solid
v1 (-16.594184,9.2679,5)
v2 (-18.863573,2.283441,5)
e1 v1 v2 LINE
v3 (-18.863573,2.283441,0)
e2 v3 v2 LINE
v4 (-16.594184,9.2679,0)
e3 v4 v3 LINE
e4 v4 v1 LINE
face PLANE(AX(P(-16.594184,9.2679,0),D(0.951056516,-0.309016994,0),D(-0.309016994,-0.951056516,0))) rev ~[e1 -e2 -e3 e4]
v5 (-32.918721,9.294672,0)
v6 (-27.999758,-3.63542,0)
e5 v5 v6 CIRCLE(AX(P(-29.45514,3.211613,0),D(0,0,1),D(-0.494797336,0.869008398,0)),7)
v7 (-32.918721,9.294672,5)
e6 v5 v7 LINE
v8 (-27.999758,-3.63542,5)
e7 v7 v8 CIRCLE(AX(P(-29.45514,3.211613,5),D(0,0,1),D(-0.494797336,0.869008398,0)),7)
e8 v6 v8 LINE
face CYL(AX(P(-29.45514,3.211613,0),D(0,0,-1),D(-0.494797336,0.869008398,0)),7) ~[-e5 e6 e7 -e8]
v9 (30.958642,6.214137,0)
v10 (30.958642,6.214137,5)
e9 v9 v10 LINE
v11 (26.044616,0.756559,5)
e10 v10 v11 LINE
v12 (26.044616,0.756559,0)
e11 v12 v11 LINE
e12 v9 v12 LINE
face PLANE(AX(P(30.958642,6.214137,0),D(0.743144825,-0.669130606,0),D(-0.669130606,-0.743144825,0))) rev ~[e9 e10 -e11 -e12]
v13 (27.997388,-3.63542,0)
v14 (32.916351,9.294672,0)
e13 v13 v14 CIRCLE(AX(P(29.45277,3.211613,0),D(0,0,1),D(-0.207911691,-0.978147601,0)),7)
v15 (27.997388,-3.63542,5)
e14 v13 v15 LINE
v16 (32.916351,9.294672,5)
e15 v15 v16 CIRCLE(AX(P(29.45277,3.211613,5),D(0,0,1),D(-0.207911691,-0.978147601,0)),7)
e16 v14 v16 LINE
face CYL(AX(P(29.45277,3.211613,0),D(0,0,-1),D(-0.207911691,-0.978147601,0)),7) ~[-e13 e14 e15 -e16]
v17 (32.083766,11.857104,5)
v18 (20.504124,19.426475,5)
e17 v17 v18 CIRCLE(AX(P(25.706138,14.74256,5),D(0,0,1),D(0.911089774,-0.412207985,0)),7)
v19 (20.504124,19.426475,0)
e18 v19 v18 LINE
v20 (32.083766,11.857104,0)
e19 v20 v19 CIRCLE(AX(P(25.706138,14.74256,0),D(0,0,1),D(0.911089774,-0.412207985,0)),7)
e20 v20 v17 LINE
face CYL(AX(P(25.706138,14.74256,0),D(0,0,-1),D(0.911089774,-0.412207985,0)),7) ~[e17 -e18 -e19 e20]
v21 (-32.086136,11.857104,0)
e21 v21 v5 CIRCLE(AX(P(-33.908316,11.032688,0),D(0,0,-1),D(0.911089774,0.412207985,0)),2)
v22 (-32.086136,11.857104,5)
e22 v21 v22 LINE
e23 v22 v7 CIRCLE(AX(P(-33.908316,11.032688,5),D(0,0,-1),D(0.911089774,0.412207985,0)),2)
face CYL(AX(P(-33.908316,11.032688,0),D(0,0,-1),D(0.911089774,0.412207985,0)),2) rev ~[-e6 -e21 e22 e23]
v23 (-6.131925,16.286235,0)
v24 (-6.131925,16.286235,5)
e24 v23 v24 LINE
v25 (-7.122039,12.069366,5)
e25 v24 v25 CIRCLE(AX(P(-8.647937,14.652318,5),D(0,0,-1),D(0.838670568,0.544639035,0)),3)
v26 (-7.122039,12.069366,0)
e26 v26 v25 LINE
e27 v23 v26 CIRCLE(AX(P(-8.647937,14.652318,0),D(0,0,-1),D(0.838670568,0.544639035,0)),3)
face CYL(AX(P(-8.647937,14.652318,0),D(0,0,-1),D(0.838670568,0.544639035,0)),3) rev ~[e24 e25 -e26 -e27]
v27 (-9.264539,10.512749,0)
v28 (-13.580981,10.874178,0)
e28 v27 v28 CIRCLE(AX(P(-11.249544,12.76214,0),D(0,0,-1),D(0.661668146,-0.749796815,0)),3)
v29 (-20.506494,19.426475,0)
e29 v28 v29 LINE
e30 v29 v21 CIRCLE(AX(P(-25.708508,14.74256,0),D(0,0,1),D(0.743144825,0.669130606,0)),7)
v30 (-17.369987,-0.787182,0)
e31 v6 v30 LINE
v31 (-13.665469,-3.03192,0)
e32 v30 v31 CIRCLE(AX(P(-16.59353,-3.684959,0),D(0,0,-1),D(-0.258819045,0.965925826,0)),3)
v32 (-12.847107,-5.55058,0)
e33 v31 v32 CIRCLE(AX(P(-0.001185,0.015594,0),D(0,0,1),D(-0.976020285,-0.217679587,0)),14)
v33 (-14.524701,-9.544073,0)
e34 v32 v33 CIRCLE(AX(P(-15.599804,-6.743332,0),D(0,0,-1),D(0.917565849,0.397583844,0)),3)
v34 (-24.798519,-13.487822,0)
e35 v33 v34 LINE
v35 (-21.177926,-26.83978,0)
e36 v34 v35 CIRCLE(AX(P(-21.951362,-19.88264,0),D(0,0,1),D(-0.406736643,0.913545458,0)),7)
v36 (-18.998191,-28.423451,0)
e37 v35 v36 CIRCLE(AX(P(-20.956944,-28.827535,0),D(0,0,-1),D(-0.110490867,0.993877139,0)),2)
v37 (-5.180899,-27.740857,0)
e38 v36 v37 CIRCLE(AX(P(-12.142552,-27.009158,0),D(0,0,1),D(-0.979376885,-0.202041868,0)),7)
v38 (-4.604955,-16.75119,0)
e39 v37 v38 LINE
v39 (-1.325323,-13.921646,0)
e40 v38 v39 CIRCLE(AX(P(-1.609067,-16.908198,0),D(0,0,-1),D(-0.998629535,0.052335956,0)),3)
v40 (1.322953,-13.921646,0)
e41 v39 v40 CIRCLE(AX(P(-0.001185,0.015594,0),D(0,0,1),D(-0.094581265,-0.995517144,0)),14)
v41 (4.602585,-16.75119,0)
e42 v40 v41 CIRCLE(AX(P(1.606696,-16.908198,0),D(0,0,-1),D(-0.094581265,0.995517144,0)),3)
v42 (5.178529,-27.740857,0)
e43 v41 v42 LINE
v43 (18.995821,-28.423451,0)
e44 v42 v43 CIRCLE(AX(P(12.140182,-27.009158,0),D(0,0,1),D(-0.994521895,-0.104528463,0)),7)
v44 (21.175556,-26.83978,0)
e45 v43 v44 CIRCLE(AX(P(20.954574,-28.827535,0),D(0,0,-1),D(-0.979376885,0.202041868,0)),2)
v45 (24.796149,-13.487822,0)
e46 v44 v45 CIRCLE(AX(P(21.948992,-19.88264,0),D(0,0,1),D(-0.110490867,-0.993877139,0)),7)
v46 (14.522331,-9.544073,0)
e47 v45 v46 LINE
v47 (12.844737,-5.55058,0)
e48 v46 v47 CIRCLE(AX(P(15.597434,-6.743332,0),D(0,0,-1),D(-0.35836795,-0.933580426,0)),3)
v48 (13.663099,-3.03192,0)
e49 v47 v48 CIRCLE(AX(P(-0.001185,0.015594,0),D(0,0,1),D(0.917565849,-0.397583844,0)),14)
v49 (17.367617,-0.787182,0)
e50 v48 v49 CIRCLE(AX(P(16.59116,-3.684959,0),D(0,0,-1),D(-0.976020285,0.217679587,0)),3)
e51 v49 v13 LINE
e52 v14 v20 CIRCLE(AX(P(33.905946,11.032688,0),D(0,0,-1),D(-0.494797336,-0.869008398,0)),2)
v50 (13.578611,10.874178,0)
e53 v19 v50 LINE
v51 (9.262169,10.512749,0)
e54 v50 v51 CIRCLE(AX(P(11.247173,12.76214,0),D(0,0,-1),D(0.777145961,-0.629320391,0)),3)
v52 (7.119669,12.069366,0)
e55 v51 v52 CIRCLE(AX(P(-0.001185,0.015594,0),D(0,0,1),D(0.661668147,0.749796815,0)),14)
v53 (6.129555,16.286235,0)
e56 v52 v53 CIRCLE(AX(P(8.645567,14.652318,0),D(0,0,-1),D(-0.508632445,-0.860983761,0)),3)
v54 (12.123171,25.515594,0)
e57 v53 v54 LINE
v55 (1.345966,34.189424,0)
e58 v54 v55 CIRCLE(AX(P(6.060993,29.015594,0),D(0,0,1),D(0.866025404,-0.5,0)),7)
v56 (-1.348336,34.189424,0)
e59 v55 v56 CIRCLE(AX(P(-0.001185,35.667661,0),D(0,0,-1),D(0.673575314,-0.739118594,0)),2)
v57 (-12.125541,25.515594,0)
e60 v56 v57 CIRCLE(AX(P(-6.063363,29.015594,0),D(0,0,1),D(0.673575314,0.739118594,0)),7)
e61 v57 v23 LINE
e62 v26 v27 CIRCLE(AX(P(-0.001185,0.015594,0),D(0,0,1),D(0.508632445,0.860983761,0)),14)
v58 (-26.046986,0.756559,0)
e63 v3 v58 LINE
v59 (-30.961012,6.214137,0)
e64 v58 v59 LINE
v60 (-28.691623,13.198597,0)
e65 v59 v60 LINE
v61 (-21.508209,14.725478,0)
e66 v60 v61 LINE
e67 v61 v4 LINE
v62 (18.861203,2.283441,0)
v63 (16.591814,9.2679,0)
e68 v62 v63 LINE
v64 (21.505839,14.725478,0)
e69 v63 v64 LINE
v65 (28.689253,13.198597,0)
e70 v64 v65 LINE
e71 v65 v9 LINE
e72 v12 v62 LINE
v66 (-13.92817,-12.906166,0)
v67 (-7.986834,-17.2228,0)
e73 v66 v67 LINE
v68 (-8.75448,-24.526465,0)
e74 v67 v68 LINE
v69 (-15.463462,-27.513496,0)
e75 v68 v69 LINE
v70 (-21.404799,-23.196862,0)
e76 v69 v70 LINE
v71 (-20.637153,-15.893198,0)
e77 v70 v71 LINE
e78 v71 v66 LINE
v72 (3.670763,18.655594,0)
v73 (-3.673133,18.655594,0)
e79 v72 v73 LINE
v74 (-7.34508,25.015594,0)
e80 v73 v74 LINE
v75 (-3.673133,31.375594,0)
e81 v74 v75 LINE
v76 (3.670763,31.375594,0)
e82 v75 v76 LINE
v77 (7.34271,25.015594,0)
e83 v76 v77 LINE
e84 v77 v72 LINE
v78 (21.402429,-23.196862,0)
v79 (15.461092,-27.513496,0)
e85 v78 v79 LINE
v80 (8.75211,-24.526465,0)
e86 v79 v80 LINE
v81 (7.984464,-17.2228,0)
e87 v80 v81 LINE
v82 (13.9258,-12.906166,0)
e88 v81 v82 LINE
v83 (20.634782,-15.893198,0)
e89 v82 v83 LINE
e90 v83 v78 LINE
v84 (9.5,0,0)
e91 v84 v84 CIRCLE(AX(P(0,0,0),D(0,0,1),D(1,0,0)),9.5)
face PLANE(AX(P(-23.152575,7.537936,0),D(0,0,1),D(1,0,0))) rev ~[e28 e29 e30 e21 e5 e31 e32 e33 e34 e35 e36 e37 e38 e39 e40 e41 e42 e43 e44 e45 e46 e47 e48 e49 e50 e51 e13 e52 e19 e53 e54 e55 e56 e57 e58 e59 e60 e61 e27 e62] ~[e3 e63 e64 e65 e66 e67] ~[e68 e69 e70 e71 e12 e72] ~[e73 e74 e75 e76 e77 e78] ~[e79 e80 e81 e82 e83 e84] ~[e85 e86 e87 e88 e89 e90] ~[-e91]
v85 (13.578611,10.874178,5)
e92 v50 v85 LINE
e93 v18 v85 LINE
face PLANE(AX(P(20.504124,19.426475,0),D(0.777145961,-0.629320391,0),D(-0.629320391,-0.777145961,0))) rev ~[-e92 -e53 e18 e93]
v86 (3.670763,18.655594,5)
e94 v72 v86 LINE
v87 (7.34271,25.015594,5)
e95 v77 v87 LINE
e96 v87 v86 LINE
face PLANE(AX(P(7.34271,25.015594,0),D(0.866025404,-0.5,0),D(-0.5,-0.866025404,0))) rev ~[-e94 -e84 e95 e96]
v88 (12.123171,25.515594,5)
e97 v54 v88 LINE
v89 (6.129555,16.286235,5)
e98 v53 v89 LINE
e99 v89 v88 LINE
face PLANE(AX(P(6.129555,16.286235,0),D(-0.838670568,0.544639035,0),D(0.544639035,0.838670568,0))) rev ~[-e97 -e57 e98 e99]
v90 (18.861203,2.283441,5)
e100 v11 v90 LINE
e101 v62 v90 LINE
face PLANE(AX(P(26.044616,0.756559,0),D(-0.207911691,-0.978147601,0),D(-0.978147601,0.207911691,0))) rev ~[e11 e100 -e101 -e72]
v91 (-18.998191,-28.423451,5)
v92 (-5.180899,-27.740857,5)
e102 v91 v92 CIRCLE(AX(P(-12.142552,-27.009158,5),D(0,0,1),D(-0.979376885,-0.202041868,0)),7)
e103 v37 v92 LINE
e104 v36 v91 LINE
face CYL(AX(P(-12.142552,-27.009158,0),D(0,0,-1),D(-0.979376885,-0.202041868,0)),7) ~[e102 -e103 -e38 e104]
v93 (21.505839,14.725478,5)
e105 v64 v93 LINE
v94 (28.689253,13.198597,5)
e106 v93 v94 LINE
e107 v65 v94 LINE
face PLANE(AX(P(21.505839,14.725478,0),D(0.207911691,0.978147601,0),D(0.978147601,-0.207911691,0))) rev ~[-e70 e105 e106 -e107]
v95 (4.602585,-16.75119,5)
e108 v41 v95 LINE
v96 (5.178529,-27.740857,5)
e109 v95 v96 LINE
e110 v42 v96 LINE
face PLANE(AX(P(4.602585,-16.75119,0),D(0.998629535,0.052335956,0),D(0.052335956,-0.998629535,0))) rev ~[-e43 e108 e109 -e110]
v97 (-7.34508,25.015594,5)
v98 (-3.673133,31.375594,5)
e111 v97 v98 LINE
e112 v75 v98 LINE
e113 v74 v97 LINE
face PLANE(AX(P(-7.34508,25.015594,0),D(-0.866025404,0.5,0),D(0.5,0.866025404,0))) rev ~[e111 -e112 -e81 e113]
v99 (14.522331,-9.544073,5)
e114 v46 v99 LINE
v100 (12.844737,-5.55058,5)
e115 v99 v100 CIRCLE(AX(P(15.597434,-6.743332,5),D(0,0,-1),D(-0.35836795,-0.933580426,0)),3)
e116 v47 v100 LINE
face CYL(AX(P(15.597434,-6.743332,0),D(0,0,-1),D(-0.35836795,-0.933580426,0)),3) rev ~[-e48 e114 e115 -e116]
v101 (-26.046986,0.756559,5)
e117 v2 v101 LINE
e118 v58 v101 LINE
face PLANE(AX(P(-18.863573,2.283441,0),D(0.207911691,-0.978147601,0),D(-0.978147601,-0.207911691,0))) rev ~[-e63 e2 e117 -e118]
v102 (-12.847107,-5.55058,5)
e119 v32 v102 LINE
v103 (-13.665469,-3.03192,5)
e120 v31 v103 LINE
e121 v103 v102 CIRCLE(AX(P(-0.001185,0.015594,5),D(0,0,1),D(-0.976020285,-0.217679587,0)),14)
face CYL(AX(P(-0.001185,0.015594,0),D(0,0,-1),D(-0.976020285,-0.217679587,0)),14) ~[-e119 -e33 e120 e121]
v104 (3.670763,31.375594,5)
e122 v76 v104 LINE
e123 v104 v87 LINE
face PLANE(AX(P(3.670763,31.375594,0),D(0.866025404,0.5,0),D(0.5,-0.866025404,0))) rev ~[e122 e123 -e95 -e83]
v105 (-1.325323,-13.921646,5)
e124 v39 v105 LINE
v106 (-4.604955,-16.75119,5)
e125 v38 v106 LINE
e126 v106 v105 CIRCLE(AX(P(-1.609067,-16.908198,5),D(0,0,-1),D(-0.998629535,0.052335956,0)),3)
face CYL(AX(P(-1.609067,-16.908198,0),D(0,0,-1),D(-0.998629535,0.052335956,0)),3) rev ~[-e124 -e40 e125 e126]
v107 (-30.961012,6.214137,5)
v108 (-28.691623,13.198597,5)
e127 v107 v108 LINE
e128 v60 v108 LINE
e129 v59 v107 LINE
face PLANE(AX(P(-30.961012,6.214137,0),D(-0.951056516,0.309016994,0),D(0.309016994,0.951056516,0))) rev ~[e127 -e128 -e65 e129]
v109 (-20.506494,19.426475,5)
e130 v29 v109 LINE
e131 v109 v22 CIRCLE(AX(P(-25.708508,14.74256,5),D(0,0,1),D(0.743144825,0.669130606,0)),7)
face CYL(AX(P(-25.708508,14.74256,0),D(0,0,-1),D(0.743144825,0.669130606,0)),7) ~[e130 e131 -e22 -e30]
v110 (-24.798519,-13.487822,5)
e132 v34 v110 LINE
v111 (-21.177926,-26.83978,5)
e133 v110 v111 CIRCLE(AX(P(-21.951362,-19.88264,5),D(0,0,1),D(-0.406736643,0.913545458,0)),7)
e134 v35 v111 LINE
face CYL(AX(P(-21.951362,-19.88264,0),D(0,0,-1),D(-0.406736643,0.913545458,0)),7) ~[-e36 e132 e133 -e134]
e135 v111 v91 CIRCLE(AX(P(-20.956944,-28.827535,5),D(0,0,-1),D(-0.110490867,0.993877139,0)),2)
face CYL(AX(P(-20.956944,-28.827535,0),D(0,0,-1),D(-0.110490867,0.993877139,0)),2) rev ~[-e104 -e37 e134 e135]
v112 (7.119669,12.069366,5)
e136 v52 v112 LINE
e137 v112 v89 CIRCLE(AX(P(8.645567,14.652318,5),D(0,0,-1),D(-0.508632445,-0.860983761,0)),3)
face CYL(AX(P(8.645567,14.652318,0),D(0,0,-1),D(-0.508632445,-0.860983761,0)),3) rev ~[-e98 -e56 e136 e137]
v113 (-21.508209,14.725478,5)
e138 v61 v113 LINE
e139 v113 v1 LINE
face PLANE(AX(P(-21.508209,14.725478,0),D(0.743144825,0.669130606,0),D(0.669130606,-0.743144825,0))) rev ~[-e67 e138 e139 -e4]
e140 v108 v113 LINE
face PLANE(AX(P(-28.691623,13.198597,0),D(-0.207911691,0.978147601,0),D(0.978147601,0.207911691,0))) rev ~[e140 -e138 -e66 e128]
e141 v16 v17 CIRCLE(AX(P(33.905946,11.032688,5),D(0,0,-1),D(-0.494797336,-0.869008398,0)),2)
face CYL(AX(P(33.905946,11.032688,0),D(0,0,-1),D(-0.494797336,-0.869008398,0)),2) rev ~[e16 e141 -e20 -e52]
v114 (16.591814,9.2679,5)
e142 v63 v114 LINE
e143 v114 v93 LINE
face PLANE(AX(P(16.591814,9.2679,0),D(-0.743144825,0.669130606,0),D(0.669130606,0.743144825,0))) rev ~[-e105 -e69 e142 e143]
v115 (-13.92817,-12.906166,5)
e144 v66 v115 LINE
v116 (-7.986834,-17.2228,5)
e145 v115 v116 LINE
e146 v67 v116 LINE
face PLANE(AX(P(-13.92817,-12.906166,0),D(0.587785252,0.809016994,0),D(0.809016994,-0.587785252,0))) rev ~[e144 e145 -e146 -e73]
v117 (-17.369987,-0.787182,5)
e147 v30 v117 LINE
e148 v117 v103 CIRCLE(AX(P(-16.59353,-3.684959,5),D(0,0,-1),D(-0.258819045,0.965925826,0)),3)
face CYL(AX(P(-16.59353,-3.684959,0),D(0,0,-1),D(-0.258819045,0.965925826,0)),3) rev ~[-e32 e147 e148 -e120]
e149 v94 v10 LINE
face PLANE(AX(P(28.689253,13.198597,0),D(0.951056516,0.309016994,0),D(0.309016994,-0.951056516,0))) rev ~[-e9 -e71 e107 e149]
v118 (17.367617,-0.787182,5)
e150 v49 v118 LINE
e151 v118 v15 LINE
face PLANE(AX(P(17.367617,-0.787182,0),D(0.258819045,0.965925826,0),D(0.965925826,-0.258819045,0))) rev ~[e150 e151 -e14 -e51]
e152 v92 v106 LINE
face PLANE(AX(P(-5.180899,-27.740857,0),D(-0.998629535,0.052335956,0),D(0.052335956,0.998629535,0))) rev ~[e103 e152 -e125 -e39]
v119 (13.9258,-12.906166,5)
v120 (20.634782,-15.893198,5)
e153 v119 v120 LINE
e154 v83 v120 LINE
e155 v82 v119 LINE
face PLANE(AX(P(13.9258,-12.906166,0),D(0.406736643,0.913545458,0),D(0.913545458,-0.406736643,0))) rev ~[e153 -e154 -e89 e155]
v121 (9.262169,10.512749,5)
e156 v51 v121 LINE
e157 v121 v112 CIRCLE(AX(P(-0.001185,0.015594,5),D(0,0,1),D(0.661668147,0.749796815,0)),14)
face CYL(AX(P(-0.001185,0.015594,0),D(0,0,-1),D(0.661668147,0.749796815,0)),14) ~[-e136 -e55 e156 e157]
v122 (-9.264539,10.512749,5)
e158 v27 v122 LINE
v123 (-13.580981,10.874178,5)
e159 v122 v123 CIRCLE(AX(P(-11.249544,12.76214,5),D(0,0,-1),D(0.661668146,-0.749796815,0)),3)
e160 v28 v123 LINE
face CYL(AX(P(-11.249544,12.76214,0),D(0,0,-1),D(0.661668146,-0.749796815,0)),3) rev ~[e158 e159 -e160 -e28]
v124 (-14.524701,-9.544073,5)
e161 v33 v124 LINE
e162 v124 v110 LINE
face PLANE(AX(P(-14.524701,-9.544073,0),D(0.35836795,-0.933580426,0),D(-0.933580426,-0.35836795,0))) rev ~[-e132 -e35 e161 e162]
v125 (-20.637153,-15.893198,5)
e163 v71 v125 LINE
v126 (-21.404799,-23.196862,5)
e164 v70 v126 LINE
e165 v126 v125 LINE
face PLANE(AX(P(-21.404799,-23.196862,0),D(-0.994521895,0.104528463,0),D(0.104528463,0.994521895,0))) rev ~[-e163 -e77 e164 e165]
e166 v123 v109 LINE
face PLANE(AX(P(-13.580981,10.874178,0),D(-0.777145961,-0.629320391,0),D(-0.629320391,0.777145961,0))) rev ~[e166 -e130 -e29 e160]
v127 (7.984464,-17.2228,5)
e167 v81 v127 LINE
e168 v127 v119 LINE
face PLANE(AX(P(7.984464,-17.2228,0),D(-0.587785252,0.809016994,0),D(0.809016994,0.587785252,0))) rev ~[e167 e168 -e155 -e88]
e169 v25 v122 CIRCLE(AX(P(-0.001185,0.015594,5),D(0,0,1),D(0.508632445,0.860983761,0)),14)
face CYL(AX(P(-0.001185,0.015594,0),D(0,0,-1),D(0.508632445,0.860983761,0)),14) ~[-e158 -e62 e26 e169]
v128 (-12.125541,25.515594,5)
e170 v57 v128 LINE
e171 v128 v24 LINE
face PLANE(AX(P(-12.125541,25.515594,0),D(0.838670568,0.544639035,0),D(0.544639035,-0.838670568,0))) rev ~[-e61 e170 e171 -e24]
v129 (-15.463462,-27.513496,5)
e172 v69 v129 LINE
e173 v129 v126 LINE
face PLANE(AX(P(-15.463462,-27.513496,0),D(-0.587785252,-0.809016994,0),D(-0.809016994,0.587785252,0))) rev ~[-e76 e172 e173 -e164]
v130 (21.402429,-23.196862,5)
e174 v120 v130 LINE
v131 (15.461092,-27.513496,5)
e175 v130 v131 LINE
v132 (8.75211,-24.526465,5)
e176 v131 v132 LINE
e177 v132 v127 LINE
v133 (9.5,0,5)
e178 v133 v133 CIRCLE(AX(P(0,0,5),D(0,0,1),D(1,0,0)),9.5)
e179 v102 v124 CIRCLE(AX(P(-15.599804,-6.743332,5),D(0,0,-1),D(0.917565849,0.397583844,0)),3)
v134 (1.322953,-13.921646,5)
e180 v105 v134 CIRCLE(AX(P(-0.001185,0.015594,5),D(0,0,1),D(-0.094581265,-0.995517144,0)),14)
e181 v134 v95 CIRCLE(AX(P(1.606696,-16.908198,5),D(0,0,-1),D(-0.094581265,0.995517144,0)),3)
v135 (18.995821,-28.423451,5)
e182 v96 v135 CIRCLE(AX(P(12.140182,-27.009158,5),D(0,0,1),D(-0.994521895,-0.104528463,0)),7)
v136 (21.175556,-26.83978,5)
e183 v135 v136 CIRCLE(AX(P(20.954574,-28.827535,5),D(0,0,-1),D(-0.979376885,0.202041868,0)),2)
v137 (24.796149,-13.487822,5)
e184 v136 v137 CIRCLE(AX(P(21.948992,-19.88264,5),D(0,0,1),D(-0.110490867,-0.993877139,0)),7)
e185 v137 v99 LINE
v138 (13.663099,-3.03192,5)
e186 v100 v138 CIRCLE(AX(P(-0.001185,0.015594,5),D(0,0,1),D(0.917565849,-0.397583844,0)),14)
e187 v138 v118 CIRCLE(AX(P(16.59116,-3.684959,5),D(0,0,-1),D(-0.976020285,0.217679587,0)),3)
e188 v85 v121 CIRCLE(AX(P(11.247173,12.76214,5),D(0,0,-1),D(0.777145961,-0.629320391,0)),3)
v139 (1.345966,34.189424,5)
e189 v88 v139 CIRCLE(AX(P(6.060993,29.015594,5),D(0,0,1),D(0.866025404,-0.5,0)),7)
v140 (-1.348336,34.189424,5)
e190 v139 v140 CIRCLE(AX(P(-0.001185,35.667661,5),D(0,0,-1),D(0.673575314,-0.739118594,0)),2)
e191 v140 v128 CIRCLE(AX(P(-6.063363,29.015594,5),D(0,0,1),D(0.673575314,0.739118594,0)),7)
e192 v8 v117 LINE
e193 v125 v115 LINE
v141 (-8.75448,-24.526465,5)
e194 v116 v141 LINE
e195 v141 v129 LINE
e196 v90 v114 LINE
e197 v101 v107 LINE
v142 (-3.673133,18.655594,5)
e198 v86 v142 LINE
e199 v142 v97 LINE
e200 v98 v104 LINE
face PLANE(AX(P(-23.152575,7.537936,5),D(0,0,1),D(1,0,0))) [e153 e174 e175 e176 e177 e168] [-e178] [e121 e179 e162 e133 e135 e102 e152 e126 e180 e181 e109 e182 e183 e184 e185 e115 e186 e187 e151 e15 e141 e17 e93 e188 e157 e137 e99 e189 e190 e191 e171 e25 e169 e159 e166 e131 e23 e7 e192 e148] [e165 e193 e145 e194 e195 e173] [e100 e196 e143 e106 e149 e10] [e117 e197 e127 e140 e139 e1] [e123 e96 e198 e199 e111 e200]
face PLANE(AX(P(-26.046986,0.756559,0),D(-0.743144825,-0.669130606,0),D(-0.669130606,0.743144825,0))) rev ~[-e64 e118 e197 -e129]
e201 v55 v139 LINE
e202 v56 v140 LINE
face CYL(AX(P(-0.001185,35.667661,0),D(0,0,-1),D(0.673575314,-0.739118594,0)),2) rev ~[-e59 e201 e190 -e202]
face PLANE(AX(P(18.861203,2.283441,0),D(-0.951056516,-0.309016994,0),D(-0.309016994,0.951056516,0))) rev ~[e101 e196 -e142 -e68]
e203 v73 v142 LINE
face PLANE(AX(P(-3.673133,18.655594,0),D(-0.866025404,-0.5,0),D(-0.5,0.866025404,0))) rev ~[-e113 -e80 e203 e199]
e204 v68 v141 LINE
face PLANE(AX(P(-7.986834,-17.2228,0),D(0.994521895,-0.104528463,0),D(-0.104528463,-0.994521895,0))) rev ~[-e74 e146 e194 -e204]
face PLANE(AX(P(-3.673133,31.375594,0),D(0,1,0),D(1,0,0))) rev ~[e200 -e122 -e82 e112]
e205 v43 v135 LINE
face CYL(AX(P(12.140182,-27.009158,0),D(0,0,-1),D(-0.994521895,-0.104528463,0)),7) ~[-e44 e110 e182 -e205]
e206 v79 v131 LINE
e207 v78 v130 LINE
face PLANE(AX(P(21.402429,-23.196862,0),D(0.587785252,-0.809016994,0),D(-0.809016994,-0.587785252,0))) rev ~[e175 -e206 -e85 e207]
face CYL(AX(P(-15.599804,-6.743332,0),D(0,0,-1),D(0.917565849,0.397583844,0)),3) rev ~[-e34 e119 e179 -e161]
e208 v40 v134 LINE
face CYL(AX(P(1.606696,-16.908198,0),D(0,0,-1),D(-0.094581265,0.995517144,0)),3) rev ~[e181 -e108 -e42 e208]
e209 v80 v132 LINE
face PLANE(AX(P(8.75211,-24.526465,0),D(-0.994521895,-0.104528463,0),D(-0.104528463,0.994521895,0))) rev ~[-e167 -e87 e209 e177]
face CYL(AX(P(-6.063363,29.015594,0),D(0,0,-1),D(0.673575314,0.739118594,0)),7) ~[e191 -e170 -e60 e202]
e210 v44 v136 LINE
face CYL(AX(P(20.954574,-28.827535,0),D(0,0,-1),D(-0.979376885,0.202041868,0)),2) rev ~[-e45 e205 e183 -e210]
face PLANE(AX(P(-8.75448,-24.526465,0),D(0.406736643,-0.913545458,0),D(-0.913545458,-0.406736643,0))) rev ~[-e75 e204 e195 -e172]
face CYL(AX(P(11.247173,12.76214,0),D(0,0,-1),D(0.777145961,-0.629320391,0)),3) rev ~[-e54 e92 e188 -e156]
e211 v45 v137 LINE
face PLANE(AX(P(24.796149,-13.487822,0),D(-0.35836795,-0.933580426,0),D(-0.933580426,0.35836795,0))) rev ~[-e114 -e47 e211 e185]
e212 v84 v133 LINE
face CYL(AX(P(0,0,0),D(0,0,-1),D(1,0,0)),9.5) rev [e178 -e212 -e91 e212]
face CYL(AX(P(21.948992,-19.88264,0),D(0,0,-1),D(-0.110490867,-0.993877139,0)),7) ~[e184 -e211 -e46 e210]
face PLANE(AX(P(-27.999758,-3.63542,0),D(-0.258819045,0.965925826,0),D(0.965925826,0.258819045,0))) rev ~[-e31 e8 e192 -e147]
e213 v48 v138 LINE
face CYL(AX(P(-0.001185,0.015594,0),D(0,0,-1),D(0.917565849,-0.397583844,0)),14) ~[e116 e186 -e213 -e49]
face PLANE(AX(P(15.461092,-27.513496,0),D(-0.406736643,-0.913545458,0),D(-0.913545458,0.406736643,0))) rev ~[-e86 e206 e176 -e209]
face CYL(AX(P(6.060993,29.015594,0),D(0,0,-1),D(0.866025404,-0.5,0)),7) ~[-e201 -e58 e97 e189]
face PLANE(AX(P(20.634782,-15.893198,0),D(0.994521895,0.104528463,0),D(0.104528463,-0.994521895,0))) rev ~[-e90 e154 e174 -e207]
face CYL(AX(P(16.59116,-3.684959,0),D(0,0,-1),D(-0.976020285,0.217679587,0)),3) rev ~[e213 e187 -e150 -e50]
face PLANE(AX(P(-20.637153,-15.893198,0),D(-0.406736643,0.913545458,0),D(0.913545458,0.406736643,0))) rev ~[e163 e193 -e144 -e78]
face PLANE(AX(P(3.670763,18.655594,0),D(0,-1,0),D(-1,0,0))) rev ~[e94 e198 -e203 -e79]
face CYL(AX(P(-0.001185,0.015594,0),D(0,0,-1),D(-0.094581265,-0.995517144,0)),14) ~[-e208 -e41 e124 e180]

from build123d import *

# Parameters (mm, degrees)
F0_R     = 9.5
F1_DEPTH = 5


# Not quite as in the source:
# - a feature names something its author has since deleted; it is built from what else it names


with BuildPart() as f1:
    # F0 (on Top) → F1 (new body)
    with BuildSketch(Plane.XY):
        with BuildLine():
            ThreePointArc((-13.665469042, -3.0319204432), (-13.3159762762, 4.3418317), (-9.2645390994, 10.5127491897))
            ThreePointArc((-9.2645390994, 10.5127491897), (-11.4998669549, 9.7726015122), (-13.5809814233, 10.8741784618))
            Line((-13.5809814233, 10.8741784618), (-20.506494271, 19.426474585))
            ThreePointArc((-20.506494271, 19.426474585), (-29.538567909, 20.601795911), (-32.0861364699, 11.8571044442))
            ThreePointArc((-32.0861364699, 11.8571044442), (-32.0062029861, 10.4146544851), (-32.9187213461, 9.2946716776))
            ThreePointArc((-32.9187213461, 9.2946716776), (-35.997695766, 0.7226444411), (-27.9997581563, -3.6354203143))
            Line((-27.9997581563, -3.6354203143), (-17.3699870332, -0.7871817262))
            ThreePointArc((-17.3699870332, -0.7871817262), (-15.0388393758, -1.1192356462), (-13.665469042, -3.0319204432))
        make_face()
        Polygon((-28.6916231536, 13.1985965214), (-21.5082094645, 14.7254782362), (-16.5941842664, 9.267900353), (-18.8635727573, 2.2834407549), (-26.0469864464, 0.7565590401), (-30.9610116446, 6.2141369233), align=None, mode=Mode.SUBTRACT)
        with BuildLine():
            ThreePointArc((9.2621690031, 10.5127491897), (8.227808484, 11.3418317), (7.1196691813, 12.0693664265))
            ThreePointArc((7.1196691813, 12.0693664265), (-0.0011850481, 14.0155937788), (-7.1220392775, 12.0693664265))
            ThreePointArc((-7.1220392775, 12.0693664265), (-8.2301785802, 11.3418317), (-9.2645390994, 10.5127491897))
            ThreePointArc((-9.2645390994, 10.5127491897), (-13.3159762762, 4.3418317), (-13.665469042, -3.0319204432))
            ThreePointArc((-13.665469042, -3.0319204432), (-13.3159762762, -4.3106441425), (-12.847106931, -5.5505800398))
            ThreePointArc((-12.847106931, -5.5505800398), (-8.2301785802, -11.3106441425), (-1.3253227589, -13.9216462393))
            ThreePointArc((-1.3253227589, -13.9216462393), (-0.0011850481, -13.9844062212), (1.3229526627, -13.9216462393))
            ThreePointArc((1.3229526627, -13.9216462393), (8.227808484, -11.3106441425), (12.8447368348, -5.5505800398))
            ThreePointArc((12.8447368348, -5.5505800398), (13.31360618, -4.3106441425), (13.6630989458, -3.0319204432))
            ThreePointArc((13.6630989458, -3.0319204432), (13.9146328566, -1.5173811207), (13.9988149519, 0.0155937788))
            ThreePointArc((13.9988149519, 0.0155937788), (12.7598289539, 5.7737637694), (9.2621690031, 10.5127491897))
        make_face()
        Circle(F0_R, mode=Mode.SUBTRACT)
        with BuildLine():
            ThreePointArc((-1.3253227589, -13.9216462393), (-8.2301785802, -11.3106441425), (-12.847106931, -5.5505800398))
            ThreePointArc((-12.847106931, -5.5505800398), (-12.8339389546, -7.9052213736), (-14.5247006287, -9.5440728519))
            Line((-14.5247006287, -9.5440728519), (-24.7985187507, -13.4878221314))
            ThreePointArc((-24.7985187507, -13.4878221314), (-28.7073800051, -21.7146403569), (-21.1779261823, -26.8397803113))
            ThreePointArc((-21.1779261823, -26.8397803113), (-19.7813739443, -27.2095006015), (-18.998190678, -28.4234508549))
            ThreePointArc((-18.998190678, -28.4234508549), (-11.7971637379, -34.0006316328), (-5.1808992125, -27.7408570242))
            Line((-5.1808992125, -27.7408570242), (-4.6049551583, -16.7511898031))
            ThreePointArc((-4.6049551583, -16.7511898031), (-3.5687888714, -14.6367469374), (-1.3253227589, -13.9216462393))
        make_face()
        Polygon((-21.4047986615, -23.1968624525), (-20.6371525584, -15.8931976559), (-13.9281702523, -12.906166284), (-7.9868340493, -17.2227997087), (-8.7544801524, -24.5264645053), (-15.4634624585, -27.5134958771), align=None, mode=Mode.SUBTRACT)
        with BuildLine():
            ThreePointArc((7.1196691813, 12.0693664265), (5.7249926142, 13.9665713389), (6.1295548123, 16.2862348132))
            Line((6.1295548123, 16.2862348132), (12.1231706049, 25.5155937788))
            ThreePointArc((12.1231706049, 25.5155937788), (10.4499033622, 34.4688005315), (1.34596558, 34.1894239382))
            ThreePointArc((1.34596558, 34.1894239382), (-0.0011850481, 33.6676611266), (-1.3483356762, 34.1894239382))
            ThreePointArc((-1.3483356762, 34.1894239382), (-10.4522734584, 34.4688005315), (-12.1255407011, 25.5155937788))
            Line((-12.1255407011, 25.5155937788), (-6.1319249085, 16.2862348132))
            ThreePointArc((-6.1319249085, 16.2862348132), (-5.7273627104, 13.9665713389), (-7.1220392775, 12.0693664265))
            ThreePointArc((-7.1220392775, 12.0693664265), (-0.0011850481, 14.0155937788), (7.1196691813, 12.0693664265))
        make_face()
        Polygon((-7.3450804722, 25.0155937788), (-3.6731327602, 31.3755937788), (3.6707626639, 31.3755937788), (7.342710376, 25.0155937788), (3.6707626639, 18.6555937788), (-3.6731327602, 18.6555937788), align=None, mode=Mode.SUBTRACT)
        with BuildLine():
            ThreePointArc((14.5223305325, -9.5440728519), (12.8315688584, -7.9052213736), (12.8447368348, -5.5505800398))
            ThreePointArc((12.8447368348, -5.5505800398), (8.227808484, -11.3106441425), (1.3229526627, -13.9216462393))
            ThreePointArc((1.3229526627, -13.9216462393), (3.5664187752, -14.6367469374), (4.6025850621, -16.7511898031))
            Line((4.6025850621, -16.7511898031), (5.1785291162, -27.7408570242))
            ThreePointArc((5.1785291162, -27.7408570242), (11.7947936417, -34.0006316328), (18.9958205818, -28.4234508549))
            ThreePointArc((18.9958205818, -28.4234508549), (19.7790038481, -27.2095006015), (21.1755560861, -26.8397803113))
            ThreePointArc((21.1755560861, -26.8397803113), (28.7050099089, -21.7146403569), (24.7961486545, -13.4878221314))
            Line((24.7961486545, -13.4878221314), (14.5223305325, -9.5440728519))
        make_face()
        Polygon((7.9844639531, -17.2227997087), (13.9258001561, -12.906166284), (20.6347824622, -15.8931976559), (21.4024285653, -23.1968624525), (15.4610923623, -27.5134958771), (8.7521100562, -24.5264645053), align=None, mode=Mode.SUBTRACT)
        with BuildLine():
            ThreePointArc((13.5786113271, 10.8741784618), (11.4974968587, 9.7726015122), (9.2621690031, 10.5127491897))
            ThreePointArc((9.2621690031, 10.5127491897), (12.7598289539, 5.7737637694), (13.9988149519, 0.0155937788))
            ThreePointArc((13.9988149519, 0.0155937788), (13.9146328566, -1.5173811207), (13.6630989458, -3.0319204432))
            ThreePointArc((13.6630989458, -3.0319204432), (15.0364692796, -1.1192356462), (17.367616937, -0.7871817262))
            Line((17.367616937, -0.7871817262), (27.99738806, -3.6354203143))
            ThreePointArc((27.99738806, -3.6354203143), (35.9953256698, 0.7226444411), (32.9163512498, 9.2946716776))
            ThreePointArc((32.9163512498, 9.2946716776), (32.0038328898, 10.4146544851), (32.0837663737, 11.8571044442))
            ThreePointArc((32.0837663737, 11.8571044442), (29.5361978128, 20.601795911), (20.5041241748, 19.426474585))
            Line((20.5041241748, 19.426474585), (13.5786113271, 10.8741784618))
        make_face()
        Polygon((18.8612026611, 2.2834407549), (16.5918141702, 9.267900353), (21.5058393683, 14.7254782362), (28.6892530574, 13.1985965214), (30.9586415484, 6.2141369233), (26.0446163502, 0.7565590401), align=None, mode=Mode.SUBTRACT)
    extrude(amount=F1_DEPTH)


solid = f1.part
